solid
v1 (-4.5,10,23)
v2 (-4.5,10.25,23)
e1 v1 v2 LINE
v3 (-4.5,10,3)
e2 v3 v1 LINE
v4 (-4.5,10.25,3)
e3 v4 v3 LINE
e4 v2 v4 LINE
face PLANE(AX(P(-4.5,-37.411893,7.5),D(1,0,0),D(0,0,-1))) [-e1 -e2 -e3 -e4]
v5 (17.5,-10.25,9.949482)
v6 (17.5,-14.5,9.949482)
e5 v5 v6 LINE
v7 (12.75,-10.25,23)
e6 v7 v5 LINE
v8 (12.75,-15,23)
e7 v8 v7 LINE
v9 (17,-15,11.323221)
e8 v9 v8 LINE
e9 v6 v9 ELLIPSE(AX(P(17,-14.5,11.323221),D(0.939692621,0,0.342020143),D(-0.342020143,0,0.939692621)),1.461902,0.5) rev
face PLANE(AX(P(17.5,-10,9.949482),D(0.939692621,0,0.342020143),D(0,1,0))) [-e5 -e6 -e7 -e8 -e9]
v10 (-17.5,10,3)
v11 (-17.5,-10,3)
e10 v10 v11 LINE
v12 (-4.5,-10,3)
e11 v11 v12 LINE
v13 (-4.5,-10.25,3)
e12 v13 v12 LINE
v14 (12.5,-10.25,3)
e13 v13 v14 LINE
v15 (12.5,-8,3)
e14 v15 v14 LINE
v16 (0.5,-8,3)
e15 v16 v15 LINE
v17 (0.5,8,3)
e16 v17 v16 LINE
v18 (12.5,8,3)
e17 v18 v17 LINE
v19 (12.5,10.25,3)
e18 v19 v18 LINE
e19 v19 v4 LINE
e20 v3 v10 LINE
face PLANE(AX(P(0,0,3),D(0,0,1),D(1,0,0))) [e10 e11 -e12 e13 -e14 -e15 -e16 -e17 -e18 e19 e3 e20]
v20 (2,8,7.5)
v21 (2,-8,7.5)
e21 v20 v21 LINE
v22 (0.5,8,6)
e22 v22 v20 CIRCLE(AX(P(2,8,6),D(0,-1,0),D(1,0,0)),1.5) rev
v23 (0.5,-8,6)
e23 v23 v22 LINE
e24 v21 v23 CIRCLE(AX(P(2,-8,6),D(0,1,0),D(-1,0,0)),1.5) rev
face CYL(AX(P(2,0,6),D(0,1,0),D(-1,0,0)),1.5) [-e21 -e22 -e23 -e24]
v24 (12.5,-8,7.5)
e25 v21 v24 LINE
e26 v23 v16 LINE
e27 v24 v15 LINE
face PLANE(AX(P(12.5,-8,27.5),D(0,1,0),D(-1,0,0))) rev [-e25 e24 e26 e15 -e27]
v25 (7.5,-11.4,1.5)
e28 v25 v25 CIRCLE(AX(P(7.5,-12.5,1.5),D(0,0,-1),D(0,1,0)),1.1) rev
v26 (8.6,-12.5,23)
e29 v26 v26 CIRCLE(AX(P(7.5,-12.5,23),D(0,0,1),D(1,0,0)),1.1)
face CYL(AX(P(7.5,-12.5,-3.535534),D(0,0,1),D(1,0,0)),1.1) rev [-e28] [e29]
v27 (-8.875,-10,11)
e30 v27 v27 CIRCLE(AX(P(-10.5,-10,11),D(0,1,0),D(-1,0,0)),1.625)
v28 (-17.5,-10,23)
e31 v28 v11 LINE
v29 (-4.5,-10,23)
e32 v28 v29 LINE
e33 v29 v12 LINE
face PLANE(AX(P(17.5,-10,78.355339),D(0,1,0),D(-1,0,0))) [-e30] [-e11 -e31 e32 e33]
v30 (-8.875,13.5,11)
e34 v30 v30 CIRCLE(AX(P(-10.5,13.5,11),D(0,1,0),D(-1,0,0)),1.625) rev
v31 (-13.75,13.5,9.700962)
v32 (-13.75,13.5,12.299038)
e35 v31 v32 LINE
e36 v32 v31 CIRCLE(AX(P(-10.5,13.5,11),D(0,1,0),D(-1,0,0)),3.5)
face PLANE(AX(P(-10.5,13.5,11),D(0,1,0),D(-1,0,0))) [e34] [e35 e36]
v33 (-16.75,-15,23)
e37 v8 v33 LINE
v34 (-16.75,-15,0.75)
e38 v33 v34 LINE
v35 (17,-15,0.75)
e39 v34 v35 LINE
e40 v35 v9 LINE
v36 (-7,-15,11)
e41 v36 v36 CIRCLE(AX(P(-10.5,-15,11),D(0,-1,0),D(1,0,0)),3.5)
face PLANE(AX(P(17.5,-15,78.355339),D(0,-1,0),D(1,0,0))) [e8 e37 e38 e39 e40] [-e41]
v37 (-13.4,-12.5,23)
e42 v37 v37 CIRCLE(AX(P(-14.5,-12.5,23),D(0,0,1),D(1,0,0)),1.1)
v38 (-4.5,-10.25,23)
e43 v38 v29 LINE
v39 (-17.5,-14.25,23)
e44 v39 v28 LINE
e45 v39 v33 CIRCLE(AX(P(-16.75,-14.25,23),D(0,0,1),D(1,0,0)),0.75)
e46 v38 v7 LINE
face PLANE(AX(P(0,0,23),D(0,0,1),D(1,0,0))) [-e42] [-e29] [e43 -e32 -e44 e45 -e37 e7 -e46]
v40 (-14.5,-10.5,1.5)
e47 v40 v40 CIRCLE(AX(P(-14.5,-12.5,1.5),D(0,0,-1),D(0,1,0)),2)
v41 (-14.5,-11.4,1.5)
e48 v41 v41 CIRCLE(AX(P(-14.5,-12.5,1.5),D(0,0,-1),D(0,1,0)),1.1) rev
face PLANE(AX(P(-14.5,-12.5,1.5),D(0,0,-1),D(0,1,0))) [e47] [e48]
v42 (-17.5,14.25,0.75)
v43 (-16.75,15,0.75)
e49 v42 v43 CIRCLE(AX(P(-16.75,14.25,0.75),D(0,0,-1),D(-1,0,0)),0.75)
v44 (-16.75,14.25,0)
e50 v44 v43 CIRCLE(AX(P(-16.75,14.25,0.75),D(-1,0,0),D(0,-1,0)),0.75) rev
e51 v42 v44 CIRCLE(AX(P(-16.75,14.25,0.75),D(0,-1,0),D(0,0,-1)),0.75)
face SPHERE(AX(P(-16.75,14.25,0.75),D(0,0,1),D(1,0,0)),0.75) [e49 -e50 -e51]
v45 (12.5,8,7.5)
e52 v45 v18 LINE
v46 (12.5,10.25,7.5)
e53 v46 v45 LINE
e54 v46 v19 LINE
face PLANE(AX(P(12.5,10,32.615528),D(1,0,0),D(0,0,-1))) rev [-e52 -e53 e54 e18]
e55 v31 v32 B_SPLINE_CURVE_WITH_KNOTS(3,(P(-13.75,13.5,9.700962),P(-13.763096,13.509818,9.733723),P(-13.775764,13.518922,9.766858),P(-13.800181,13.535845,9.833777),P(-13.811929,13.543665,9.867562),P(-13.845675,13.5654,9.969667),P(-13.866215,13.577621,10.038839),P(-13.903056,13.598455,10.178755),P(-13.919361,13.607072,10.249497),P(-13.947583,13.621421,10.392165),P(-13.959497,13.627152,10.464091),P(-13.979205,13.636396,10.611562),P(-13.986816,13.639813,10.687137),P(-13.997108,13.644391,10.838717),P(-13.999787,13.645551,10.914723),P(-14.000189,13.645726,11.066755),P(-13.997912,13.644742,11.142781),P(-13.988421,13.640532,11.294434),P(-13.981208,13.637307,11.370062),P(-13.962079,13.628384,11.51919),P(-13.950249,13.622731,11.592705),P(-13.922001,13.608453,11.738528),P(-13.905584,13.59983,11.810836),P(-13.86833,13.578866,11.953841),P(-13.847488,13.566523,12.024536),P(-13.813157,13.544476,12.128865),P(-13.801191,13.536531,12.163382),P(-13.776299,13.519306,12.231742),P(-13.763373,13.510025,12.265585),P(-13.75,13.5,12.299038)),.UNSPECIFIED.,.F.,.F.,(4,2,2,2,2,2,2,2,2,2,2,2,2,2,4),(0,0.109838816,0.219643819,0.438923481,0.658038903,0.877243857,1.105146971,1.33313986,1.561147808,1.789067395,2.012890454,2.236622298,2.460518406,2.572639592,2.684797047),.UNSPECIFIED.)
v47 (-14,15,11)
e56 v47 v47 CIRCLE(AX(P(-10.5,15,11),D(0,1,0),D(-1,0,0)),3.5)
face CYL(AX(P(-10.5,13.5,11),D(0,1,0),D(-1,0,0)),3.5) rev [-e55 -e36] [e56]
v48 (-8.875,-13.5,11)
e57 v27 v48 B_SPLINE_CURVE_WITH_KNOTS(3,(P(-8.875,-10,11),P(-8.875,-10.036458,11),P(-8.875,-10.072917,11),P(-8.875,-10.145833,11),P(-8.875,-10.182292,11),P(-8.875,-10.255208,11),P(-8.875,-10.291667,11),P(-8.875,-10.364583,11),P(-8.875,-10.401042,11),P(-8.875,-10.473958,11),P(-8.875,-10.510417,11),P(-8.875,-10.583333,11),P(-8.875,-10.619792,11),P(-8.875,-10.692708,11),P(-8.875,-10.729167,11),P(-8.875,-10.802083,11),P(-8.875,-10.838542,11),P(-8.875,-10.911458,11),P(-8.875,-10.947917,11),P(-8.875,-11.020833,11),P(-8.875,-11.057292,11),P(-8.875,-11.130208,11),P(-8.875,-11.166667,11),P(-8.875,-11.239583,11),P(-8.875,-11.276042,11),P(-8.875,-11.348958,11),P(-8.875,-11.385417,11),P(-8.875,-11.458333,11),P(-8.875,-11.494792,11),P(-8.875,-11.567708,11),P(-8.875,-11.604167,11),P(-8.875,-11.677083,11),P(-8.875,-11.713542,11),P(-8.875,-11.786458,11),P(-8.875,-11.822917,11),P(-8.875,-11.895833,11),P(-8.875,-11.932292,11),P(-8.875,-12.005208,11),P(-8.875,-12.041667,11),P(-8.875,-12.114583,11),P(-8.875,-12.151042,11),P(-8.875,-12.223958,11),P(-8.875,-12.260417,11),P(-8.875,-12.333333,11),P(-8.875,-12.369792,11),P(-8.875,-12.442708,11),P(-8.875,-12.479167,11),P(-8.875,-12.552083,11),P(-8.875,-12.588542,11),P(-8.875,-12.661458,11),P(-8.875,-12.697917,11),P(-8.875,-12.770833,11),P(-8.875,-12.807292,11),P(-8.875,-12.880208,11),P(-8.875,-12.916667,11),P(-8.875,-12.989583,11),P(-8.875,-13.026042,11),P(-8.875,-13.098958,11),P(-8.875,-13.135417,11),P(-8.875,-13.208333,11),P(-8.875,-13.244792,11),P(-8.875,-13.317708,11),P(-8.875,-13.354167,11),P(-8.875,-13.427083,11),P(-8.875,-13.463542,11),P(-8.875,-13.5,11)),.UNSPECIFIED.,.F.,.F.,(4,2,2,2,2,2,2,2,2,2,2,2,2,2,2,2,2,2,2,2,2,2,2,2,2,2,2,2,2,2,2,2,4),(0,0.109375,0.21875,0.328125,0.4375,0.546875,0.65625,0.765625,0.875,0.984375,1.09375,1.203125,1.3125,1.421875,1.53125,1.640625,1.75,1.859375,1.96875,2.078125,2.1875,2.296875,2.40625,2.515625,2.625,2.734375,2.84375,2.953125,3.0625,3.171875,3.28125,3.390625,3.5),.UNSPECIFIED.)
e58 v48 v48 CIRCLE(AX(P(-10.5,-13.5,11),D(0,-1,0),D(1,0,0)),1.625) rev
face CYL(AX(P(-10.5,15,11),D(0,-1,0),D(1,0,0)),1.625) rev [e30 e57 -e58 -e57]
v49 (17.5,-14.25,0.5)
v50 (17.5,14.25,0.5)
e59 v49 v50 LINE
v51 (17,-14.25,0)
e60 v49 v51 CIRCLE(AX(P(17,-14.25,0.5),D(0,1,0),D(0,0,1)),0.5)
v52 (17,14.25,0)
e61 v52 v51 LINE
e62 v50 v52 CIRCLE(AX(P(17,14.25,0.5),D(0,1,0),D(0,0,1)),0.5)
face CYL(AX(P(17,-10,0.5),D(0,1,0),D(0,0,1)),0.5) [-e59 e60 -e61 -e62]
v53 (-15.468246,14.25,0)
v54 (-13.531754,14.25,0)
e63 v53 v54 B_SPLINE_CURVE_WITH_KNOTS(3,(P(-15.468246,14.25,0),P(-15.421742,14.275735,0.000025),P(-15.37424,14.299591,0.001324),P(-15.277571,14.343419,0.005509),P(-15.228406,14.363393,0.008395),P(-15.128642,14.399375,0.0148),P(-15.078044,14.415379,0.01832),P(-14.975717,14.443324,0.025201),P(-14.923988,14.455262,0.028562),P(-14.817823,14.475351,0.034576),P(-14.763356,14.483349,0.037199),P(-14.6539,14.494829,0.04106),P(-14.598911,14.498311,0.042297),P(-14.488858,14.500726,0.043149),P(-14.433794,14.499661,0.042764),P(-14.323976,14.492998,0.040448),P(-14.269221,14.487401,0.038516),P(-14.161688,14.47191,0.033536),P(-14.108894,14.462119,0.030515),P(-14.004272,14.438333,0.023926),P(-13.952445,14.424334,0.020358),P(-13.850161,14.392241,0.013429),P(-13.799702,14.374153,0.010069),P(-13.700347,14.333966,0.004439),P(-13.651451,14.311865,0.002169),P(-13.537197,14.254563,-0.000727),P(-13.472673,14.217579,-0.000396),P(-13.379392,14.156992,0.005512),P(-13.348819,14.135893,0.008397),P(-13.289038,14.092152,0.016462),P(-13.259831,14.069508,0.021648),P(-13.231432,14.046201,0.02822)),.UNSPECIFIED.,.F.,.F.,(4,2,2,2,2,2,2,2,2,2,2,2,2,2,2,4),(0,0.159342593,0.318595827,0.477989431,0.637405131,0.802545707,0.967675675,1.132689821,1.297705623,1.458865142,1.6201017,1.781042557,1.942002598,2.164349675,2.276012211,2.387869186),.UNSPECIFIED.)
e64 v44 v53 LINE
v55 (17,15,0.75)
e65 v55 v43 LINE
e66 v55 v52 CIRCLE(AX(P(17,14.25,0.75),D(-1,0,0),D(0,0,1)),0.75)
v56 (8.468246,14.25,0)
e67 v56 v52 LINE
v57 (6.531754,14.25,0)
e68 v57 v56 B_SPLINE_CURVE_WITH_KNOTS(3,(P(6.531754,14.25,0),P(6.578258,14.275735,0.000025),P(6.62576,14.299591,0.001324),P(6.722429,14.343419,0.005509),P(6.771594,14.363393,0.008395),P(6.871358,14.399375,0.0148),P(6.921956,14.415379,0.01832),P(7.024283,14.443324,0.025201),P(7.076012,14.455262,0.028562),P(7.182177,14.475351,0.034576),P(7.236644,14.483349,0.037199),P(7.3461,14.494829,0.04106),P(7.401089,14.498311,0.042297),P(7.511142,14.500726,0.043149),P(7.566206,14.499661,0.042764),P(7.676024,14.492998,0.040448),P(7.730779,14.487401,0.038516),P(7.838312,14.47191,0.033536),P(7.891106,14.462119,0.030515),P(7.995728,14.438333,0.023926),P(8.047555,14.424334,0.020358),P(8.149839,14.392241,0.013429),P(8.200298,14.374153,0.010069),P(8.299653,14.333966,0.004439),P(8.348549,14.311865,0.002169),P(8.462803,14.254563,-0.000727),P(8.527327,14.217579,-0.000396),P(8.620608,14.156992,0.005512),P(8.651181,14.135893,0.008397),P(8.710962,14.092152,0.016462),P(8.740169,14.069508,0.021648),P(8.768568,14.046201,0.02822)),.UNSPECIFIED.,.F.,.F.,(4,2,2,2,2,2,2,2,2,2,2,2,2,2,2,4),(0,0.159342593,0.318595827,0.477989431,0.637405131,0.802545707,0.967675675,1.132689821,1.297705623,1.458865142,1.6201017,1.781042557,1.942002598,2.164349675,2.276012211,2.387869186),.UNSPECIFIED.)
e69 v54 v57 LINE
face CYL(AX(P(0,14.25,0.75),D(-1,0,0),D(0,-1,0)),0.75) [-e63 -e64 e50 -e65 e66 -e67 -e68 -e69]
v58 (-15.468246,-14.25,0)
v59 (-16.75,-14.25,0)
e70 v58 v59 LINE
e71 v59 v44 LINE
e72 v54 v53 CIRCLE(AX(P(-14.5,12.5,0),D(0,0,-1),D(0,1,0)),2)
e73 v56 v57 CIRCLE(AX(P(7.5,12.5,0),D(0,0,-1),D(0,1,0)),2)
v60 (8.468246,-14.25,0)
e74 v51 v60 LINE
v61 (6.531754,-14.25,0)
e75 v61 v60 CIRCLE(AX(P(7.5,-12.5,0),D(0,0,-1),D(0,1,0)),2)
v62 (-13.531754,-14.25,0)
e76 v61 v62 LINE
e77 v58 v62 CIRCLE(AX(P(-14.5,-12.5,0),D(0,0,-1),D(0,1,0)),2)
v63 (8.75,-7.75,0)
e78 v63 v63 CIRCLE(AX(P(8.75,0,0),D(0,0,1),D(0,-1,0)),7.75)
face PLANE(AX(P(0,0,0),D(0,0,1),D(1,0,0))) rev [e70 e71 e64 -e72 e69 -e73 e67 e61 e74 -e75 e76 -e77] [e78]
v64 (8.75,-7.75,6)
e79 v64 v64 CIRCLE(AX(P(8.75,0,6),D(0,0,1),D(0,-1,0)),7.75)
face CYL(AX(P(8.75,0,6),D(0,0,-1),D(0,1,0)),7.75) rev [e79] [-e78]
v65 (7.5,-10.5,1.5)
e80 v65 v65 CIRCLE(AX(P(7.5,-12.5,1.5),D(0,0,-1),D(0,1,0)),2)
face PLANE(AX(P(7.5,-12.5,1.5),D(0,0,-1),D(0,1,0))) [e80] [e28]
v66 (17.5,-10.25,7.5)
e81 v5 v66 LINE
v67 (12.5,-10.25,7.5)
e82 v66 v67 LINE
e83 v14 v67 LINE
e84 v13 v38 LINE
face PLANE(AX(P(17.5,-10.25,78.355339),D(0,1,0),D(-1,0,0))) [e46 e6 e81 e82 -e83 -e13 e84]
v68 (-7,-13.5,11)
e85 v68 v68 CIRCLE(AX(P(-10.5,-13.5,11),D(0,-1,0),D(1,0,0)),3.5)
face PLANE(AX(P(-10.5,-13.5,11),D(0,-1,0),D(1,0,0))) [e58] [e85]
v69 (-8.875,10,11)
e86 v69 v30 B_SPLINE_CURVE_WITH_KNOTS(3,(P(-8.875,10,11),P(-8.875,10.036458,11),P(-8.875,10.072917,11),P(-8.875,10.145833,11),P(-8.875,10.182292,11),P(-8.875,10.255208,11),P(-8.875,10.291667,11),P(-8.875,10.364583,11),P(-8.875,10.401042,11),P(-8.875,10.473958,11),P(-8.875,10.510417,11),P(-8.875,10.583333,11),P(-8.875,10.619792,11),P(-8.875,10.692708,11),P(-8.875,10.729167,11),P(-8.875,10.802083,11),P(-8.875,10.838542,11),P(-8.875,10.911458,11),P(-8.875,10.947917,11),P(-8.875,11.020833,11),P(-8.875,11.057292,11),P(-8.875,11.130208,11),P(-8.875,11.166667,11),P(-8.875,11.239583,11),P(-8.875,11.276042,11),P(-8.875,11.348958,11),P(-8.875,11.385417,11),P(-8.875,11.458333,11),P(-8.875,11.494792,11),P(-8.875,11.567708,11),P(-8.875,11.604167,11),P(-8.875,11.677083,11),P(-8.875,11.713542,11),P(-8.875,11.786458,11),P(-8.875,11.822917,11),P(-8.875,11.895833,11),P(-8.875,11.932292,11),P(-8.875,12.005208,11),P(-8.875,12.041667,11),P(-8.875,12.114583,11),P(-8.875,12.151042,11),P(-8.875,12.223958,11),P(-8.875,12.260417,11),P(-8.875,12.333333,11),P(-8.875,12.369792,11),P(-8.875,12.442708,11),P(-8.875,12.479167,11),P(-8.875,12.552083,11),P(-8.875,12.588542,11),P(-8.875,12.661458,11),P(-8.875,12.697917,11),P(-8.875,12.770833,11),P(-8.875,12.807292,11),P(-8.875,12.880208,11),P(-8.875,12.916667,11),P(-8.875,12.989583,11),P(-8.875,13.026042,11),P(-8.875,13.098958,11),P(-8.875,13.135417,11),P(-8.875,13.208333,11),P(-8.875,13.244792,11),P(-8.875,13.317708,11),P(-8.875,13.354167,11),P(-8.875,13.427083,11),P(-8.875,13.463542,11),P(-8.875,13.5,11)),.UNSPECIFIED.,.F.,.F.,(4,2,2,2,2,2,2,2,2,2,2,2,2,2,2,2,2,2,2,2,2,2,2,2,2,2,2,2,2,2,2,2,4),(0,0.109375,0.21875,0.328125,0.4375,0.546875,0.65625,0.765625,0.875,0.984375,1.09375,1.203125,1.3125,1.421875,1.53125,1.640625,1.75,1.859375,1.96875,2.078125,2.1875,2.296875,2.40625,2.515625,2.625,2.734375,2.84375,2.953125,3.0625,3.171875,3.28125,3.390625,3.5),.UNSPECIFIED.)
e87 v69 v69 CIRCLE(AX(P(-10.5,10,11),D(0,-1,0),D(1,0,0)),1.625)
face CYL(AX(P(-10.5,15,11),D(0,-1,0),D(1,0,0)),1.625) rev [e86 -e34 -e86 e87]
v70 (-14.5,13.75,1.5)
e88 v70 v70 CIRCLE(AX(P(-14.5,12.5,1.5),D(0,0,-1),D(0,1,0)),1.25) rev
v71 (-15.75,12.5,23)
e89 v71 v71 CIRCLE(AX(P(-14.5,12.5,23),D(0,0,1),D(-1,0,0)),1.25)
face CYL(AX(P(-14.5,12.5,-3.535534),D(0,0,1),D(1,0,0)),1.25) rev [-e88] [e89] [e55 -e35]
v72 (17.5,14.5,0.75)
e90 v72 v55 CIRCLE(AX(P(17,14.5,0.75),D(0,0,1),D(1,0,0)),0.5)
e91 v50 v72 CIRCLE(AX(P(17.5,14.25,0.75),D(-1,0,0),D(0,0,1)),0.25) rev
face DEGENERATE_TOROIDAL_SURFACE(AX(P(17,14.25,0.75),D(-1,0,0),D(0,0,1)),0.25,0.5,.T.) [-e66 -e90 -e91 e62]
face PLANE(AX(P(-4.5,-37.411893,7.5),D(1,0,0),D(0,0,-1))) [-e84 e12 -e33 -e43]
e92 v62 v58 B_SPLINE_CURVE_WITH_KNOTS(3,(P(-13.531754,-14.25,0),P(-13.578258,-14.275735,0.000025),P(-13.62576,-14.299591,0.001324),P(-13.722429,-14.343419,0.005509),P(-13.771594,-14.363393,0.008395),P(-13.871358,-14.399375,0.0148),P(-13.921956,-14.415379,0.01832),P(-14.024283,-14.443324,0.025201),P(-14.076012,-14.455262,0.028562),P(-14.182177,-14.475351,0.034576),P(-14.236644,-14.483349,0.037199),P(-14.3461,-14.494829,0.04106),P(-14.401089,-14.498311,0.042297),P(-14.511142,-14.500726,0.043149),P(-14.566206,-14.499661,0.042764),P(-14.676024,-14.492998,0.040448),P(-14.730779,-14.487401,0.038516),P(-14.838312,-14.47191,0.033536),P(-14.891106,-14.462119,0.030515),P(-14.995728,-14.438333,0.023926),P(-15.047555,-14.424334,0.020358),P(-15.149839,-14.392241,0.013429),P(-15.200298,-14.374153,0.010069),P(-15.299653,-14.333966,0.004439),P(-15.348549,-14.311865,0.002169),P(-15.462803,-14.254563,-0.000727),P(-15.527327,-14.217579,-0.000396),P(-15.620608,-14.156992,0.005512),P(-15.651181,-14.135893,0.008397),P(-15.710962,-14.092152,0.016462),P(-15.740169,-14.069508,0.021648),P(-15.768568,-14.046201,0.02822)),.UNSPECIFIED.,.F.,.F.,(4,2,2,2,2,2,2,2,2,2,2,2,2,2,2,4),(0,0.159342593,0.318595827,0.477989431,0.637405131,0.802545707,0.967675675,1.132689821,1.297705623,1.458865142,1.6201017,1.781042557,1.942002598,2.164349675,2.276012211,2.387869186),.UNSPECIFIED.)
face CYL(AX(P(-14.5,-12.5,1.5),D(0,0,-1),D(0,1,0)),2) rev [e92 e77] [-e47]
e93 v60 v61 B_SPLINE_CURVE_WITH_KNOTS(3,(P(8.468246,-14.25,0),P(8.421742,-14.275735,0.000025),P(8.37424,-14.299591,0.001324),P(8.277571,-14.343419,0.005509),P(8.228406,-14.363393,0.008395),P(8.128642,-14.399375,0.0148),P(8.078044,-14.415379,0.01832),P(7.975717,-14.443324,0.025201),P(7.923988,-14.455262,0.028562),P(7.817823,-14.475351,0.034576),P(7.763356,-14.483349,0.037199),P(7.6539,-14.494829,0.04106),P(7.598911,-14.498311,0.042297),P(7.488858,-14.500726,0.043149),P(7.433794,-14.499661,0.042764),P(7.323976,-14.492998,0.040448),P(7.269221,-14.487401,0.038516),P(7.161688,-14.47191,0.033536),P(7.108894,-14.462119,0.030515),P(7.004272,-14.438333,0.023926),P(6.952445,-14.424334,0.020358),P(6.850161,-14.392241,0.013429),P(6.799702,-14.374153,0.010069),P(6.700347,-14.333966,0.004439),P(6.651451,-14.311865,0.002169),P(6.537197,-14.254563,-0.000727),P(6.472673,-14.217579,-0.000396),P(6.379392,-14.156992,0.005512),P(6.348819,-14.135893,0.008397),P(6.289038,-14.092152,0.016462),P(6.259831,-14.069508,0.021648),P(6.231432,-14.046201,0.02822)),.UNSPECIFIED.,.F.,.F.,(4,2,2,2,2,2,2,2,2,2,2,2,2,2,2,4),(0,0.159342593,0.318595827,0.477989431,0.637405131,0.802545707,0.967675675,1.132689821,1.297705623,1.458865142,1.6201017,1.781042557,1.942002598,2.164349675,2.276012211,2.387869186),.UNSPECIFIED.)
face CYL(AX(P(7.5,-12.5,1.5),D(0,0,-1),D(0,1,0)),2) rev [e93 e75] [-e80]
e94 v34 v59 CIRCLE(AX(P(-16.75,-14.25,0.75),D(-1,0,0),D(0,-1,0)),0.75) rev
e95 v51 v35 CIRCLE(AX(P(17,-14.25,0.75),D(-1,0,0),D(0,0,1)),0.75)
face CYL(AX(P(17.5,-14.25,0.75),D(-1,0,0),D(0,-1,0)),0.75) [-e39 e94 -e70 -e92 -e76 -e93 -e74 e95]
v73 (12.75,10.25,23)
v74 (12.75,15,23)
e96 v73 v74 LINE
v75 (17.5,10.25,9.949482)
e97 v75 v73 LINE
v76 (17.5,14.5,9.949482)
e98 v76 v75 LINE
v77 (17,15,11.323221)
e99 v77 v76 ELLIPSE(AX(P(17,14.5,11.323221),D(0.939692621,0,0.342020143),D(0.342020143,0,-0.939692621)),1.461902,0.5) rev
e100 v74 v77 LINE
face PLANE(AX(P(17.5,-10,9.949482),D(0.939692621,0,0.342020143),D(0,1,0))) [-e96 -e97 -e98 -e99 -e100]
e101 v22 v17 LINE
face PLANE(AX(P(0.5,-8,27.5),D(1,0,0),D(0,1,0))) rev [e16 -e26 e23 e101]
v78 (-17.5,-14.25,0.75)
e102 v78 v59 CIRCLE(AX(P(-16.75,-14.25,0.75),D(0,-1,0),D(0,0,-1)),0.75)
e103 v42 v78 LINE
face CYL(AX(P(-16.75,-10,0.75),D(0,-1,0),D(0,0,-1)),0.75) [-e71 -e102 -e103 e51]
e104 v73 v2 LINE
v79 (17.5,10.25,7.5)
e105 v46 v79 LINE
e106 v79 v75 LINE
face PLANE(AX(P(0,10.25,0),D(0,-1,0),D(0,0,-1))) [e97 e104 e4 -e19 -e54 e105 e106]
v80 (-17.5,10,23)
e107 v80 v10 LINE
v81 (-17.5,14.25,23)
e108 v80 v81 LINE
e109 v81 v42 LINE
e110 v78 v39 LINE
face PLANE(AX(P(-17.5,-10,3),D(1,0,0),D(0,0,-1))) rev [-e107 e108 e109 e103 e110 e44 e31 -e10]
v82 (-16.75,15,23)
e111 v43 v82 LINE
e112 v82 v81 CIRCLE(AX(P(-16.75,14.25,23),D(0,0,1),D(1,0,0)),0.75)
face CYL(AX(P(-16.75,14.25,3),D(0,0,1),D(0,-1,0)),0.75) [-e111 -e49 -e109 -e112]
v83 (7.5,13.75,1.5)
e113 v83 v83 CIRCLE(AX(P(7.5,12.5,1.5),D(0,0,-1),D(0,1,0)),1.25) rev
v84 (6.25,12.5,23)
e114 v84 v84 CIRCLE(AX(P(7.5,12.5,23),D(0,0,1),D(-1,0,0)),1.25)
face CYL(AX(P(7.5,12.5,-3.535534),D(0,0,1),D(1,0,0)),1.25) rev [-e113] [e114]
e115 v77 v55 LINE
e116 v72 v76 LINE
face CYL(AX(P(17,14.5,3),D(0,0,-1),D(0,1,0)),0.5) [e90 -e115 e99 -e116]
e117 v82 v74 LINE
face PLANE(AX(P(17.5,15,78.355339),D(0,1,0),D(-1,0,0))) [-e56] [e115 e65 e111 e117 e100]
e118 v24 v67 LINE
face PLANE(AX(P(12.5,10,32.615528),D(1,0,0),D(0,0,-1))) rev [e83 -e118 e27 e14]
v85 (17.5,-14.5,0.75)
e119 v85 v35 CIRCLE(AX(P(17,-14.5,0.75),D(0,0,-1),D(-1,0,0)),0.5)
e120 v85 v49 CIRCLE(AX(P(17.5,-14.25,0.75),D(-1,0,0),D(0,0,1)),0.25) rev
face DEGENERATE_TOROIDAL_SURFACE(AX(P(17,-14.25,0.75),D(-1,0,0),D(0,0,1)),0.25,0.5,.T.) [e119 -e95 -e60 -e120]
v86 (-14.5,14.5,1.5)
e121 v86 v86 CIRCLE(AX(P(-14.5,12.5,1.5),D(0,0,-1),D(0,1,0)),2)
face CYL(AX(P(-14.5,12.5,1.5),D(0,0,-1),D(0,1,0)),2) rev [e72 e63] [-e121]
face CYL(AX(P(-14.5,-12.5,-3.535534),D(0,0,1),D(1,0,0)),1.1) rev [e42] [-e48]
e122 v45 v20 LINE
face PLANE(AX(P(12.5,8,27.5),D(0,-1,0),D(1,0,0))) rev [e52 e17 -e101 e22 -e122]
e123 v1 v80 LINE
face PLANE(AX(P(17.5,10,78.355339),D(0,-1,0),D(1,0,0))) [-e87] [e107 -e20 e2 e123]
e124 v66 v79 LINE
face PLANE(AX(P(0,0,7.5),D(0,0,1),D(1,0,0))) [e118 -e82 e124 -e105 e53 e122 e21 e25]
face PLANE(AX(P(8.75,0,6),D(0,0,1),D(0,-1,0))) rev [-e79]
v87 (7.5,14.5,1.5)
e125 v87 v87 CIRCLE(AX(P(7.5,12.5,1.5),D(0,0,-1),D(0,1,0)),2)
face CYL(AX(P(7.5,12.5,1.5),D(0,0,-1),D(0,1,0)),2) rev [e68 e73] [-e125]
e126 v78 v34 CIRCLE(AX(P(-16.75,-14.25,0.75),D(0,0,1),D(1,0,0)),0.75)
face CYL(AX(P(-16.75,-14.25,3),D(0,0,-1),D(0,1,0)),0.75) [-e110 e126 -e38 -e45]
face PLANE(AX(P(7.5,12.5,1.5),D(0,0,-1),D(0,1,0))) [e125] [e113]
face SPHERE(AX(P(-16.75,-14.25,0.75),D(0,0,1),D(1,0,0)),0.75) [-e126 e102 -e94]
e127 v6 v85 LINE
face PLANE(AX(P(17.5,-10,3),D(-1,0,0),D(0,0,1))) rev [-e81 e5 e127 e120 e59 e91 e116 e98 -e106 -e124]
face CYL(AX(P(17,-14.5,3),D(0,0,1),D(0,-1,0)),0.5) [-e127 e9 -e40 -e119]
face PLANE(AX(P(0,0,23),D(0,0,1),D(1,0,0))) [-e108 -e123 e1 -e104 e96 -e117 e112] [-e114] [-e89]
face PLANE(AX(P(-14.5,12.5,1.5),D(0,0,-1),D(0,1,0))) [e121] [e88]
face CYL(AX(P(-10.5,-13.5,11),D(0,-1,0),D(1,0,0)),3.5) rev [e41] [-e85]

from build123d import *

# Parameters (mm, degrees)
SKETCH1_W              = 35
SKETCH1_H              = 20
BASE_PLATE_DEPTH       = 3
SKETCH2_W              = 35
SKETCH2_H              = 5
SIDE_WALLS_DEPTH       = 23
SKETCH4_R              = 1.1
SKETCH4_R_2            = 1.25
M2_SCREWS_DEPTH        = 23
SKETCH6_W              = 5
SKETCH6_H              = 20
RETURN_STOPPER_DEPTH   = 4.5
SKETCH9_W              = 12
SKETCH9_H              = 16
BOSS_EXTRUDE1_DEPTH    = 4.5
SKETCH7_R              = 7.75
MAGNET_POCKET_DEPTH    = 6
SKETCH8_R              = 2
M2_SCREW_HEAD_DEPTH    = 1.5
M3_ACHSLE_DEPTH        = 39.213217609
M3_ACHSLE_DEPTH_BACK   = 39.213217609
SKETCH5_R              = 1.625
SKETCH14_R             = 3.5
CUT_EXTRUDE1_DEPTH     = 1.5
CUT_EXTRUDE2_START     = -1.5
SKETCH15_R             = 3.5
CUT_EXTRUDE2_DEPTH     = 1.5
FILLET1_R              = 1.5
LEAVER_START           = -0.25
SKETCH11_W             = 22
SKETCH11_H             = 15.5
LEAVER_SPACE_DEPTH     = 20.5
SKETCH12_W             = 17
SKETCH12_H             = 4.5
MORE_SPACE_LEFT_DEPTH  = 0.25
SKETCH13_W             = 17
SKETCH13_H             = 4.5
MORE_SPACE_RIGHT_DEPTH = 0.25
FILLET2_R              = 0.75
FILLET3_R              = 0.75
FILLET4_R              = 0.75
FILLET5_R              = 0.5
CHAMFER1_SIZE          = 13.050517742
CHAMFER1_SIZE_2        = 4.75


with BuildPart() as part:
    # Sketch1 → Base Plate (new body)
    with BuildSketch(Plane.XY):
        Rectangle(SKETCH1_W, SKETCH1_H)
    extrude(amount=BASE_PLATE_DEPTH)

    # Sketch2 → Side Walls (add)
    with BuildSketch(Plane(origin=(0, 0, 0), x_dir=(1, 0, 0), z_dir=(0, 0, -1))):
        with Locations((0, -12.5)):
            Rectangle(SKETCH2_W, SKETCH2_H)
        with Locations((0, 12.5)):
            Rectangle(SKETCH2_W, SKETCH2_H)
    extrude(amount=-SIDE_WALLS_DEPTH)

    # Sketch4 → M2 Screws (cut)
    with BuildSketch(Plane.XY.offset(23)):
        with Locations((-14.5, -12.5)):
            Circle(SKETCH4_R)
        with Locations((7.5, -12.5)):
            Circle(SKETCH4_R)
        with Locations((7.5, 12.5)):
            Circle(SKETCH4_R_2)
        with Locations((-14.5, 12.5)):
            Circle(SKETCH4_R_2)
    extrude(amount=-M2_SCREWS_DEPTH, mode=Mode.SUBTRACT)

    # Sketch6 → Return Stopper (add)
    with BuildSketch(Plane.XY.offset(3)):
        with Locations((15, 0)):
            Rectangle(SKETCH6_W, SKETCH6_H)
    extrude(amount=RETURN_STOPPER_DEPTH)

    # Sketch9 → Boss-Extrude1 (add)
    with BuildSketch(Plane.XY.offset(3)):
        with Locations((6.5, 0)):
            Rectangle(SKETCH9_W, SKETCH9_H)
    extrude(amount=BOSS_EXTRUDE1_DEPTH)

    # Sketch7 → Magnet Pocket (cut)
    with BuildSketch(Plane(origin=(0, 0, 0), x_dir=(-1, 0, 0), z_dir=(0, 0, 1))):
        with Locations(Location((-8.75, 0, 0), (0, 0, 90))):
            Circle(SKETCH7_R)
    extrude(amount=MAGNET_POCKET_DEPTH, mode=Mode.SUBTRACT)

    # Sketch8 → M2 Screw Head (cut)
    with BuildSketch(Plane(origin=(0, 0, 0), x_dir=(1, 0, 0), z_dir=(0, 0, -1))):
        with Locations(Location((7.5, -12.5, 0), (0, 0, 270))):
            Circle(SKETCH8_R)
        with Locations(Location((-14.5, -12.5, 0), (0, 0, 270))):
            Circle(SKETCH8_R)
        with Locations(Location((7.5, 12.5, 0), (0, 0, 270))):
            Circle(SKETCH8_R)
        with Locations(Location((-14.5, 12.5, 0), (0, 0, 270))):
            Circle(SKETCH8_R)
    extrude(amount=-M2_SCREW_HEAD_DEPTH, mode=Mode.SUBTRACT)

    # Sketch5 → M3 Achsle (cut, two sides: drawn at the far end of the back side and taken through both)
    with BuildSketch(Plane.XZ.offset(-10).offset(-M3_ACHSLE_DEPTH_BACK)):
        with Locations((-10.5, 11)):
            Circle(SKETCH5_R)
    extrude(amount=M3_ACHSLE_DEPTH + M3_ACHSLE_DEPTH_BACK, mode=Mode.SUBTRACT)

    # Sketch14 → Cut-Extrude1 (cut)
    with BuildSketch(Plane(origin=(0, 15, 0), x_dir=(-1, 0, 0), z_dir=(0, 1, 0))):
        with Locations((10.5, 11)):
            Circle(SKETCH14_R)
    extrude(amount=-CUT_EXTRUDE1_DEPTH, mode=Mode.SUBTRACT)

    # Sketch15 → Cut-Extrude2 (cut)
    with BuildSketch(Plane.XZ.offset(15).offset(CUT_EXTRUDE2_START)):
        with Locations(Location((-10.5, 11, 0), (0, 0, 180))):
            Circle(SKETCH15_R)
    extrude(amount=CUT_EXTRUDE2_DEPTH, mode=Mode.SUBTRACT)

    # Fillet1
    fillet1_edges = [part.edges().sort_by_distance(p)[0] for p in [
        (0.5, 0, 7.5),
    ]]
    fillet(fillet1_edges, radius=FILLET1_R)

    # Sketch11 → Leaver Space (cut)
    with BuildSketch(Plane.XZ.offset(-10).offset(LEAVER_START)):
        with Locations((6.5, 15.25)):
            Rectangle(SKETCH11_W, SKETCH11_H)
    extrude(amount=LEAVER_SPACE_DEPTH, mode=Mode.SUBTRACT)

    # Sketch12 → More Space left (cut)
    with BuildSketch(Plane.XZ.offset(-10)):
        with Locations((4, 5.25)):
            Rectangle(SKETCH12_W, SKETCH12_H)
    extrude(amount=-MORE_SPACE_LEFT_DEPTH, mode=Mode.SUBTRACT)

    # Sketch13 → More Space right (cut)
    with BuildSketch(Plane(origin=(0, -10, 0), x_dir=(-1, 0, 0), z_dir=(0, 1, 0))):
        with Locations((-4, 5.25)):
            Rectangle(SKETCH13_W, SKETCH13_H)
    extrude(amount=-MORE_SPACE_RIGHT_DEPTH, mode=Mode.SUBTRACT)

    # Fillet2
    # the kernel refuses this fillet: 0.75 mm, written as the material it takes off along each edge
    with BuildSketch(Plane(origin=(19.375, 15, 0), x_dir=(0, -1, 0), z_dir=(-1, 0, 0))) as fillet2_piece_1:
        with BuildLine():
            CenterArc((FILLET2_R, FILLET2_R), FILLET2_R, 180, 90)
            Line((0, FILLET2_R), (0, 0))
            Line((0, 0), (FILLET2_R, 0))
        make_face()
    extrude(amount=38.75, mode=Mode.SUBTRACT)

    # Fillet3
    # the kernel refuses this fillet: 0.75 mm, written as the material it takes off along each edge
    with BuildSketch(Plane(origin=(-19.375, -15, 0), x_dir=(0, 1, 0), z_dir=(1, 0, 0))) as fillet3_piece_1:
        with BuildLine():
            CenterArc((FILLET3_R, FILLET3_R), FILLET3_R, 180, 90)
            Line((0, FILLET3_R), (0, 0))
            Line((0, 0), (FILLET3_R, 0))
        make_face()
    extrude(amount=38.75, mode=Mode.SUBTRACT)

    # Fillet4
    fillet4_edges = [part.edges().sort_by_distance(p)[0] for p in [
        (-17.5, -15, 11.875),
        (-17.5, 0, 0),
        (-17.5, 14.780330086, 0.219669914),
        (-17.5, -14.780330086, 0.219669914),
        (-17.5, 15, 11.875),
    ]]
    fillet(fillet4_edges, radius=FILLET4_R)

    # Fillet5
    fillet5_edges = [part.edges().sort_by_distance(p)[0] for p in [
        (17.5, -15, 11.875),
        (17.5, 14.780330086, 0.219669914),
        (17.5, 0, 0),
        (17.5, -14.780330086, 0.219669914),
        (17.5, 15, 11.875),
    ]]
    fillet(fillet5_edges, radius=FILLET5_R)

    # Chamfer1
    # the kernel refuses this chamfer: 13.050517742, 4.75 mm, written as the material it takes off along each edge
    with BuildSketch(Plane(origin=(17.5, -48.355584384, 23), x_dir=(0.013184058198645798, 0, -0.9999130865277316), z_dir=(0, 1, 0))) as chamfer1_piece_1:
        Polygon((CHAMFER1_SIZE * 0.999913086559, CHAMFER1_SIZE * 0.0131840581991), (-CHAMFER1_SIZE_2 * 0.0131840581986, CHAMFER1_SIZE_2 * 0.999913086528), (0, 0), align=None)
    extrude(amount=71.961168769, mode=Mode.SUBTRACT)
    with BuildSketch(Plane(origin=(17.5, -23.605584384, 23), x_dir=(-0.9950833631817486, 0, 0.09904090225205059), z_dir=(0, 1, 0))) as chamfer1_piece_2:
        Polygon((CHAMFER1_SIZE_2 * 0.995083363182, -CHAMFER1_SIZE_2 * 0.0990409022521), (-CHAMFER1_SIZE * 0.0990409022552, -CHAMFER1_SIZE * 0.995083363213), (0, 0), align=None)
    extrude(amount=71.961168769, mode=Mode.SUBTRACT)


solid = part.part
